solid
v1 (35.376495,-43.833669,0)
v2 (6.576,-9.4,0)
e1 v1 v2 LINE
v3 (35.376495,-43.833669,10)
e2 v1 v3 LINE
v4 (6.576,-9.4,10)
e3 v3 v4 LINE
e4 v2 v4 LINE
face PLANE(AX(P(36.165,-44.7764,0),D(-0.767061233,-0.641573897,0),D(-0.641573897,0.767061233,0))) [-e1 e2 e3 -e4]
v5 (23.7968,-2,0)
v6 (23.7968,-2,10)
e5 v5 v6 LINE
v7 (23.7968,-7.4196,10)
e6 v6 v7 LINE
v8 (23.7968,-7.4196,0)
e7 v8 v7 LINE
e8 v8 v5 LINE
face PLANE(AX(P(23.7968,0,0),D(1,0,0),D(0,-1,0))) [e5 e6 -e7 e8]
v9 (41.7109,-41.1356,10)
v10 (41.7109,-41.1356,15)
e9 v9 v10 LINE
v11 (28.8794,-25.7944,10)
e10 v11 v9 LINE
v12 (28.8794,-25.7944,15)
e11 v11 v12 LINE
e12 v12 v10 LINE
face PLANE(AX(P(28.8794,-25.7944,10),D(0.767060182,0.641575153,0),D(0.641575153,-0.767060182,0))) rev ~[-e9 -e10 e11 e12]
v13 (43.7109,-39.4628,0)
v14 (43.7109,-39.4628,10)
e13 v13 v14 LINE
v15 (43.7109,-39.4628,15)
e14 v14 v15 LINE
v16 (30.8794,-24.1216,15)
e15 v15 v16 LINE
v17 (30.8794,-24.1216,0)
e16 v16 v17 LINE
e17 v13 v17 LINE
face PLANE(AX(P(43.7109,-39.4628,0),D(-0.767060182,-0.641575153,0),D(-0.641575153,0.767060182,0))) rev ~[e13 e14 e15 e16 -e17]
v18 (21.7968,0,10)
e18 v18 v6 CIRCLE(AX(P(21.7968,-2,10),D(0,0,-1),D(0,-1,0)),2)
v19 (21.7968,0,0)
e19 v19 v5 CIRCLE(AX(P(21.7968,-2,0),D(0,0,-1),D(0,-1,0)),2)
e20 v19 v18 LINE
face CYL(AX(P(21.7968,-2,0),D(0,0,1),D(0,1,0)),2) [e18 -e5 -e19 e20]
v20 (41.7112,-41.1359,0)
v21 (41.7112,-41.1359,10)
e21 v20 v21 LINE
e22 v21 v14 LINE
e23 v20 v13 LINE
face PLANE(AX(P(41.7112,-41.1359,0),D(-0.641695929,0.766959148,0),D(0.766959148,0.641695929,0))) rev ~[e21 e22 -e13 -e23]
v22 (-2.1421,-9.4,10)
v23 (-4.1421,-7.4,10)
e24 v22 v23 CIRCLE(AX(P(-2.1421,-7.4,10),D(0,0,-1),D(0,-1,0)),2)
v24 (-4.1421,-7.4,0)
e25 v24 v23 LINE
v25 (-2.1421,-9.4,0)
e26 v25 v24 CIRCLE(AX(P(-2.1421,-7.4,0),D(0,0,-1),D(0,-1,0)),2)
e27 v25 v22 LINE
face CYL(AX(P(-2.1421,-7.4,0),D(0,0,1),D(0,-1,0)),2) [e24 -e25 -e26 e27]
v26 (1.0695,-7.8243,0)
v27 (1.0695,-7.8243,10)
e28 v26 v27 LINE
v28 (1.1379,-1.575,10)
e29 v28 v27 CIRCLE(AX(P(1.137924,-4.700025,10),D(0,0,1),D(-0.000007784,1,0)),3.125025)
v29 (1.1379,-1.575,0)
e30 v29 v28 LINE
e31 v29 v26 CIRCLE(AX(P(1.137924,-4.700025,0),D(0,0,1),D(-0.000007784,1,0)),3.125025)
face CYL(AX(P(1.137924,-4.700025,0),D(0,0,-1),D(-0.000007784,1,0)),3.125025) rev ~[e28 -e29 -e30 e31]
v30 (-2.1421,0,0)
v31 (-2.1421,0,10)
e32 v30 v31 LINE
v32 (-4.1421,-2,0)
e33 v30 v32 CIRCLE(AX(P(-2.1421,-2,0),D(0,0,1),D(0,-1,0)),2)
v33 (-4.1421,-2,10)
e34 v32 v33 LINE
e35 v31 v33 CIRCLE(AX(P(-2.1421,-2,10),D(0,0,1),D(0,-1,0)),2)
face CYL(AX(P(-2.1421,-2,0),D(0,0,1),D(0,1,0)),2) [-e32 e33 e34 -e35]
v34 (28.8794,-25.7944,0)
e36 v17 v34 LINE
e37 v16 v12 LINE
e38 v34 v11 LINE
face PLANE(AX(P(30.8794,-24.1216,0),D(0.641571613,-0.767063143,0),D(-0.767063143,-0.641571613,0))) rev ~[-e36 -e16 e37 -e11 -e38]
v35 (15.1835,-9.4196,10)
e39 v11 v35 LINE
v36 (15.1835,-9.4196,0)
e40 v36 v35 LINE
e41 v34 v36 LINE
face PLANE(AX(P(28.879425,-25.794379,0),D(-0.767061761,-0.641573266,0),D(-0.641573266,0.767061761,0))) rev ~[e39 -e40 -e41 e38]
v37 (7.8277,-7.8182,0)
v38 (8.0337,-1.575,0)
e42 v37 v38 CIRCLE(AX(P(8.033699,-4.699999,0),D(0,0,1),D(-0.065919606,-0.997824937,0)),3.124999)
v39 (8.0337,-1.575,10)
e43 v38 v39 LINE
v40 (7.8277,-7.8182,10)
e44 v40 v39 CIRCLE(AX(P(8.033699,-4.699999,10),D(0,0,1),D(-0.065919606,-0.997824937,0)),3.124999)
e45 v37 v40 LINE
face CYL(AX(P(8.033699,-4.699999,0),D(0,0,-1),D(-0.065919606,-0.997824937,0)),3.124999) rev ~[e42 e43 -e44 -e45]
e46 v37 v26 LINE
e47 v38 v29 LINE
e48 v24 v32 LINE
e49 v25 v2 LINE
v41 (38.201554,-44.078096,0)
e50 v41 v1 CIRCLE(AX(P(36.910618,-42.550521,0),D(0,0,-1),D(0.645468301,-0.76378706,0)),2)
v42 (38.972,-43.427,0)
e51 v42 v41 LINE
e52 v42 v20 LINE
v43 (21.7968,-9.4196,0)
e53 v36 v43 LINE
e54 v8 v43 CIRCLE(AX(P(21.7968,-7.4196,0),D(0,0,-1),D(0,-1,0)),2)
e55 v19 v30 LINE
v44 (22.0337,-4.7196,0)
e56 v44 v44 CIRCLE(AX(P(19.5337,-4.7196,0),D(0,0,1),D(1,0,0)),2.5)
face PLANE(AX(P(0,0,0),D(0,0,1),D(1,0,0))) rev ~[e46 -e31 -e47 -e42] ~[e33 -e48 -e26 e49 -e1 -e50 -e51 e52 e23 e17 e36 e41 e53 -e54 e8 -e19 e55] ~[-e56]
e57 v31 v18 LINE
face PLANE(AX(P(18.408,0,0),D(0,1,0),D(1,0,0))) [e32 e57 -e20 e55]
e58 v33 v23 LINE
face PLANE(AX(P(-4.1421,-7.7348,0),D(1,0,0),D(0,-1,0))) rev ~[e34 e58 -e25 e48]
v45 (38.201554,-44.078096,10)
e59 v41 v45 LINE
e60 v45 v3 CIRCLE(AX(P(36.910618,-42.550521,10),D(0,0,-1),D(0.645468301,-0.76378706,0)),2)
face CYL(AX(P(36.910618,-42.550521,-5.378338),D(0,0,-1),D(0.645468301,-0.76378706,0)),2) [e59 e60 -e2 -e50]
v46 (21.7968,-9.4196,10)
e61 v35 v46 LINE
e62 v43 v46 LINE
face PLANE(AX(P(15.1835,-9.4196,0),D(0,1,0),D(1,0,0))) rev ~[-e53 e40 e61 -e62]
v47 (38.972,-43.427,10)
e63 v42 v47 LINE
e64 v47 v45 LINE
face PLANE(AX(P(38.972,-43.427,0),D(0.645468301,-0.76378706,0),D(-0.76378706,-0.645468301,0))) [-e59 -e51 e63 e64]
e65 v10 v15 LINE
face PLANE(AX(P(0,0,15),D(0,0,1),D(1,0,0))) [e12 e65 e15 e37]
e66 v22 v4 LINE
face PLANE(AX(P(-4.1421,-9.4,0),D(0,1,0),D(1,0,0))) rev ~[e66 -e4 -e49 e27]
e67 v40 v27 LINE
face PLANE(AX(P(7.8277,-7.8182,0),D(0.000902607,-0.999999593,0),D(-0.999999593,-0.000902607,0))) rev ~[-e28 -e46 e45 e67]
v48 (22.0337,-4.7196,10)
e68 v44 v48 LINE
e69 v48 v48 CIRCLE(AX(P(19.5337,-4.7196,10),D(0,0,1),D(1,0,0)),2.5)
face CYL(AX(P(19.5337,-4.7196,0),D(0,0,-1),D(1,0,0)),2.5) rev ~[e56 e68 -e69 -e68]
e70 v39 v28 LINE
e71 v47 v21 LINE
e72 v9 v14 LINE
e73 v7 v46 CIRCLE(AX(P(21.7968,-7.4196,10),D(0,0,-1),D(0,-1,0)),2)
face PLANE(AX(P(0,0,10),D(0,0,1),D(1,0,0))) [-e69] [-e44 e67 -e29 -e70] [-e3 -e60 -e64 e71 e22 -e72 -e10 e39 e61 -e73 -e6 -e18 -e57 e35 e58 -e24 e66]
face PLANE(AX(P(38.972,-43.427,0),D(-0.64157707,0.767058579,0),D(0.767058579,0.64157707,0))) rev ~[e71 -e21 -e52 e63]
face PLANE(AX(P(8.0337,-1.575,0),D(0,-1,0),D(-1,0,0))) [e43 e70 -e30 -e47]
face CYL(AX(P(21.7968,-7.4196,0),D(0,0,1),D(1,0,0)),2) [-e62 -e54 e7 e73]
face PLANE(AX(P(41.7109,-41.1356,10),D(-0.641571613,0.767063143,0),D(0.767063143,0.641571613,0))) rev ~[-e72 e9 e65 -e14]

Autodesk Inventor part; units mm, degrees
ref_plane "YZ Plane" through (0, 0, 0) normal (1, 0, 0) x (0, 1, 0)
ref_plane "XZ Plane" through (0, 0, 0) normal (0, 1, 0) x (-1, 0, 0)
ref_plane "XY Plane" through (0, 0, 0) normal (0, 0, 1) x (1, 0, 0)
sketch "スケッチ1" plane through (0, 0, 0) normal (0, 0, 1) x (1, 0, 0)
  line L0 (18.408, 0) -> (-1.0303, 0)
  arc A0 (36.165, -44.7764) -> (37.2594, -44.8743) centre (37.0041, -41.5628) ccw
  line L1 (38.972, -43.427) -> (37.2594, -44.8743)
  line L2 (31.483, -28.9072) -> (15.1835, -9.4196)
  circle A1 centre (19.5337, -4.7196) radius 2.5
  line L3 (8.0337, -1.575) -> (1.1379, -1.575)
  arc A2 (7.8277, -7.8182) -> (8.0337, -1.575) centre (8.0337, -4.7) ccw
  line L4 (7.8277, -7.8182) -> (1.0695, -7.8243)
  arc A3 (1.1379, -1.575) -> (1.0695, -7.8243) centre (1.1379, -4.7) ccw
  line L5 (36.165, -44.7764) -> (6.576, -9.4)
  line L6 (18.408, 0) -> (23.7968, 0)
  line L7 (23.7968, 0) -> (23.7968, -8.35)
  line L8 (-1.0303, 0) -> (-4.1421, 0)
  line L9 (-4.1421, 0) -> (-4.1421, -7.7348)
  line L10 (-4.1421, -7.7348) -> (-4.1421, -9.4)
  line L11 (-4.1421, -9.4) -> (6.576, -9.4)
  line L12 (15.1835, -9.4196) -> (23.7968, -9.4196)
  line L13 (23.7968, -9.4196) -> (23.7968, -7.7545)
  line L14 (41.7112, -41.1359) -> (41.7109, -41.1356)
  line L15 (41.7109, -41.1356) -> (43.7109, -39.4628)
  line L16 (43.7109, -39.4628) -> (30.8794, -24.1216)
  line L17 (30.8794, -24.1216) -> (28.8794, -25.7944)
  line L18 (38.972, -43.427) -> (41.7112, -41.1359)
  line L19 (31.483, -28.9072) -> (41.7112, -41.1359)
  point P0 (0, 0)
  point P1 (0, 0)
  dimension "d0" = 5
  dimension "d1" = 3.125
  dimension "d3" = 11.5
  dimension "d5" = 4.7
  dimension "d9" = 3.125
  dimension "d11" = 4.7
  dimension "d12" = 4.7
  dimension "d13" = 6.8958
  dimension "d14" = 20
  dimension "d19" = 2
  dimension "d24" = 46.1194
  dimension "d25" = 41.3474
extrude "押し出し1" add sketch "スケッチ1" along normal blind 10
fillet "フィレット1" radius 2 4 edges at (23.7968, 0, 5) (23.7968, -9.4196, 5) (-4.1421, 0, 5) (-4.1421, -9.4, 5)
fillet "フィレット2" radius 2 2 edges at (37.2594, -44.8743, 5) (36.165, -44.7764, 5)
sketch "スケッチ4" plane through (0, 0, 10) normal (0, 0, 1) x (1, 0, 0)
  line L0 (30.8794, -24.1216) -> (28.8794, -25.7944) projected
  line L1 (43.7109, -39.4628) -> (30.8794, -24.1216) projected
  line L2 (41.7109, -41.1356) -> (43.7109, -39.4628) projected
  line L3 (28.8794, -25.7944) -> (41.7109, -41.1356)
  line L4 (43.7109, -39.4628) -> (41.7109, -41.1356)
  line L5 (28.8794, -25.7944) -> (30.8794, -24.1216)
  line L6 (30.8794, -24.1216) -> (43.7109, -39.4628)
  point P0 (0, 0)
extrude "押し出し4" add sketch "スケッチ4" along normal blind 5
equation "\"d5\" = d11"
equation "\"d9\" = d1"
properties part number "finger_3"
